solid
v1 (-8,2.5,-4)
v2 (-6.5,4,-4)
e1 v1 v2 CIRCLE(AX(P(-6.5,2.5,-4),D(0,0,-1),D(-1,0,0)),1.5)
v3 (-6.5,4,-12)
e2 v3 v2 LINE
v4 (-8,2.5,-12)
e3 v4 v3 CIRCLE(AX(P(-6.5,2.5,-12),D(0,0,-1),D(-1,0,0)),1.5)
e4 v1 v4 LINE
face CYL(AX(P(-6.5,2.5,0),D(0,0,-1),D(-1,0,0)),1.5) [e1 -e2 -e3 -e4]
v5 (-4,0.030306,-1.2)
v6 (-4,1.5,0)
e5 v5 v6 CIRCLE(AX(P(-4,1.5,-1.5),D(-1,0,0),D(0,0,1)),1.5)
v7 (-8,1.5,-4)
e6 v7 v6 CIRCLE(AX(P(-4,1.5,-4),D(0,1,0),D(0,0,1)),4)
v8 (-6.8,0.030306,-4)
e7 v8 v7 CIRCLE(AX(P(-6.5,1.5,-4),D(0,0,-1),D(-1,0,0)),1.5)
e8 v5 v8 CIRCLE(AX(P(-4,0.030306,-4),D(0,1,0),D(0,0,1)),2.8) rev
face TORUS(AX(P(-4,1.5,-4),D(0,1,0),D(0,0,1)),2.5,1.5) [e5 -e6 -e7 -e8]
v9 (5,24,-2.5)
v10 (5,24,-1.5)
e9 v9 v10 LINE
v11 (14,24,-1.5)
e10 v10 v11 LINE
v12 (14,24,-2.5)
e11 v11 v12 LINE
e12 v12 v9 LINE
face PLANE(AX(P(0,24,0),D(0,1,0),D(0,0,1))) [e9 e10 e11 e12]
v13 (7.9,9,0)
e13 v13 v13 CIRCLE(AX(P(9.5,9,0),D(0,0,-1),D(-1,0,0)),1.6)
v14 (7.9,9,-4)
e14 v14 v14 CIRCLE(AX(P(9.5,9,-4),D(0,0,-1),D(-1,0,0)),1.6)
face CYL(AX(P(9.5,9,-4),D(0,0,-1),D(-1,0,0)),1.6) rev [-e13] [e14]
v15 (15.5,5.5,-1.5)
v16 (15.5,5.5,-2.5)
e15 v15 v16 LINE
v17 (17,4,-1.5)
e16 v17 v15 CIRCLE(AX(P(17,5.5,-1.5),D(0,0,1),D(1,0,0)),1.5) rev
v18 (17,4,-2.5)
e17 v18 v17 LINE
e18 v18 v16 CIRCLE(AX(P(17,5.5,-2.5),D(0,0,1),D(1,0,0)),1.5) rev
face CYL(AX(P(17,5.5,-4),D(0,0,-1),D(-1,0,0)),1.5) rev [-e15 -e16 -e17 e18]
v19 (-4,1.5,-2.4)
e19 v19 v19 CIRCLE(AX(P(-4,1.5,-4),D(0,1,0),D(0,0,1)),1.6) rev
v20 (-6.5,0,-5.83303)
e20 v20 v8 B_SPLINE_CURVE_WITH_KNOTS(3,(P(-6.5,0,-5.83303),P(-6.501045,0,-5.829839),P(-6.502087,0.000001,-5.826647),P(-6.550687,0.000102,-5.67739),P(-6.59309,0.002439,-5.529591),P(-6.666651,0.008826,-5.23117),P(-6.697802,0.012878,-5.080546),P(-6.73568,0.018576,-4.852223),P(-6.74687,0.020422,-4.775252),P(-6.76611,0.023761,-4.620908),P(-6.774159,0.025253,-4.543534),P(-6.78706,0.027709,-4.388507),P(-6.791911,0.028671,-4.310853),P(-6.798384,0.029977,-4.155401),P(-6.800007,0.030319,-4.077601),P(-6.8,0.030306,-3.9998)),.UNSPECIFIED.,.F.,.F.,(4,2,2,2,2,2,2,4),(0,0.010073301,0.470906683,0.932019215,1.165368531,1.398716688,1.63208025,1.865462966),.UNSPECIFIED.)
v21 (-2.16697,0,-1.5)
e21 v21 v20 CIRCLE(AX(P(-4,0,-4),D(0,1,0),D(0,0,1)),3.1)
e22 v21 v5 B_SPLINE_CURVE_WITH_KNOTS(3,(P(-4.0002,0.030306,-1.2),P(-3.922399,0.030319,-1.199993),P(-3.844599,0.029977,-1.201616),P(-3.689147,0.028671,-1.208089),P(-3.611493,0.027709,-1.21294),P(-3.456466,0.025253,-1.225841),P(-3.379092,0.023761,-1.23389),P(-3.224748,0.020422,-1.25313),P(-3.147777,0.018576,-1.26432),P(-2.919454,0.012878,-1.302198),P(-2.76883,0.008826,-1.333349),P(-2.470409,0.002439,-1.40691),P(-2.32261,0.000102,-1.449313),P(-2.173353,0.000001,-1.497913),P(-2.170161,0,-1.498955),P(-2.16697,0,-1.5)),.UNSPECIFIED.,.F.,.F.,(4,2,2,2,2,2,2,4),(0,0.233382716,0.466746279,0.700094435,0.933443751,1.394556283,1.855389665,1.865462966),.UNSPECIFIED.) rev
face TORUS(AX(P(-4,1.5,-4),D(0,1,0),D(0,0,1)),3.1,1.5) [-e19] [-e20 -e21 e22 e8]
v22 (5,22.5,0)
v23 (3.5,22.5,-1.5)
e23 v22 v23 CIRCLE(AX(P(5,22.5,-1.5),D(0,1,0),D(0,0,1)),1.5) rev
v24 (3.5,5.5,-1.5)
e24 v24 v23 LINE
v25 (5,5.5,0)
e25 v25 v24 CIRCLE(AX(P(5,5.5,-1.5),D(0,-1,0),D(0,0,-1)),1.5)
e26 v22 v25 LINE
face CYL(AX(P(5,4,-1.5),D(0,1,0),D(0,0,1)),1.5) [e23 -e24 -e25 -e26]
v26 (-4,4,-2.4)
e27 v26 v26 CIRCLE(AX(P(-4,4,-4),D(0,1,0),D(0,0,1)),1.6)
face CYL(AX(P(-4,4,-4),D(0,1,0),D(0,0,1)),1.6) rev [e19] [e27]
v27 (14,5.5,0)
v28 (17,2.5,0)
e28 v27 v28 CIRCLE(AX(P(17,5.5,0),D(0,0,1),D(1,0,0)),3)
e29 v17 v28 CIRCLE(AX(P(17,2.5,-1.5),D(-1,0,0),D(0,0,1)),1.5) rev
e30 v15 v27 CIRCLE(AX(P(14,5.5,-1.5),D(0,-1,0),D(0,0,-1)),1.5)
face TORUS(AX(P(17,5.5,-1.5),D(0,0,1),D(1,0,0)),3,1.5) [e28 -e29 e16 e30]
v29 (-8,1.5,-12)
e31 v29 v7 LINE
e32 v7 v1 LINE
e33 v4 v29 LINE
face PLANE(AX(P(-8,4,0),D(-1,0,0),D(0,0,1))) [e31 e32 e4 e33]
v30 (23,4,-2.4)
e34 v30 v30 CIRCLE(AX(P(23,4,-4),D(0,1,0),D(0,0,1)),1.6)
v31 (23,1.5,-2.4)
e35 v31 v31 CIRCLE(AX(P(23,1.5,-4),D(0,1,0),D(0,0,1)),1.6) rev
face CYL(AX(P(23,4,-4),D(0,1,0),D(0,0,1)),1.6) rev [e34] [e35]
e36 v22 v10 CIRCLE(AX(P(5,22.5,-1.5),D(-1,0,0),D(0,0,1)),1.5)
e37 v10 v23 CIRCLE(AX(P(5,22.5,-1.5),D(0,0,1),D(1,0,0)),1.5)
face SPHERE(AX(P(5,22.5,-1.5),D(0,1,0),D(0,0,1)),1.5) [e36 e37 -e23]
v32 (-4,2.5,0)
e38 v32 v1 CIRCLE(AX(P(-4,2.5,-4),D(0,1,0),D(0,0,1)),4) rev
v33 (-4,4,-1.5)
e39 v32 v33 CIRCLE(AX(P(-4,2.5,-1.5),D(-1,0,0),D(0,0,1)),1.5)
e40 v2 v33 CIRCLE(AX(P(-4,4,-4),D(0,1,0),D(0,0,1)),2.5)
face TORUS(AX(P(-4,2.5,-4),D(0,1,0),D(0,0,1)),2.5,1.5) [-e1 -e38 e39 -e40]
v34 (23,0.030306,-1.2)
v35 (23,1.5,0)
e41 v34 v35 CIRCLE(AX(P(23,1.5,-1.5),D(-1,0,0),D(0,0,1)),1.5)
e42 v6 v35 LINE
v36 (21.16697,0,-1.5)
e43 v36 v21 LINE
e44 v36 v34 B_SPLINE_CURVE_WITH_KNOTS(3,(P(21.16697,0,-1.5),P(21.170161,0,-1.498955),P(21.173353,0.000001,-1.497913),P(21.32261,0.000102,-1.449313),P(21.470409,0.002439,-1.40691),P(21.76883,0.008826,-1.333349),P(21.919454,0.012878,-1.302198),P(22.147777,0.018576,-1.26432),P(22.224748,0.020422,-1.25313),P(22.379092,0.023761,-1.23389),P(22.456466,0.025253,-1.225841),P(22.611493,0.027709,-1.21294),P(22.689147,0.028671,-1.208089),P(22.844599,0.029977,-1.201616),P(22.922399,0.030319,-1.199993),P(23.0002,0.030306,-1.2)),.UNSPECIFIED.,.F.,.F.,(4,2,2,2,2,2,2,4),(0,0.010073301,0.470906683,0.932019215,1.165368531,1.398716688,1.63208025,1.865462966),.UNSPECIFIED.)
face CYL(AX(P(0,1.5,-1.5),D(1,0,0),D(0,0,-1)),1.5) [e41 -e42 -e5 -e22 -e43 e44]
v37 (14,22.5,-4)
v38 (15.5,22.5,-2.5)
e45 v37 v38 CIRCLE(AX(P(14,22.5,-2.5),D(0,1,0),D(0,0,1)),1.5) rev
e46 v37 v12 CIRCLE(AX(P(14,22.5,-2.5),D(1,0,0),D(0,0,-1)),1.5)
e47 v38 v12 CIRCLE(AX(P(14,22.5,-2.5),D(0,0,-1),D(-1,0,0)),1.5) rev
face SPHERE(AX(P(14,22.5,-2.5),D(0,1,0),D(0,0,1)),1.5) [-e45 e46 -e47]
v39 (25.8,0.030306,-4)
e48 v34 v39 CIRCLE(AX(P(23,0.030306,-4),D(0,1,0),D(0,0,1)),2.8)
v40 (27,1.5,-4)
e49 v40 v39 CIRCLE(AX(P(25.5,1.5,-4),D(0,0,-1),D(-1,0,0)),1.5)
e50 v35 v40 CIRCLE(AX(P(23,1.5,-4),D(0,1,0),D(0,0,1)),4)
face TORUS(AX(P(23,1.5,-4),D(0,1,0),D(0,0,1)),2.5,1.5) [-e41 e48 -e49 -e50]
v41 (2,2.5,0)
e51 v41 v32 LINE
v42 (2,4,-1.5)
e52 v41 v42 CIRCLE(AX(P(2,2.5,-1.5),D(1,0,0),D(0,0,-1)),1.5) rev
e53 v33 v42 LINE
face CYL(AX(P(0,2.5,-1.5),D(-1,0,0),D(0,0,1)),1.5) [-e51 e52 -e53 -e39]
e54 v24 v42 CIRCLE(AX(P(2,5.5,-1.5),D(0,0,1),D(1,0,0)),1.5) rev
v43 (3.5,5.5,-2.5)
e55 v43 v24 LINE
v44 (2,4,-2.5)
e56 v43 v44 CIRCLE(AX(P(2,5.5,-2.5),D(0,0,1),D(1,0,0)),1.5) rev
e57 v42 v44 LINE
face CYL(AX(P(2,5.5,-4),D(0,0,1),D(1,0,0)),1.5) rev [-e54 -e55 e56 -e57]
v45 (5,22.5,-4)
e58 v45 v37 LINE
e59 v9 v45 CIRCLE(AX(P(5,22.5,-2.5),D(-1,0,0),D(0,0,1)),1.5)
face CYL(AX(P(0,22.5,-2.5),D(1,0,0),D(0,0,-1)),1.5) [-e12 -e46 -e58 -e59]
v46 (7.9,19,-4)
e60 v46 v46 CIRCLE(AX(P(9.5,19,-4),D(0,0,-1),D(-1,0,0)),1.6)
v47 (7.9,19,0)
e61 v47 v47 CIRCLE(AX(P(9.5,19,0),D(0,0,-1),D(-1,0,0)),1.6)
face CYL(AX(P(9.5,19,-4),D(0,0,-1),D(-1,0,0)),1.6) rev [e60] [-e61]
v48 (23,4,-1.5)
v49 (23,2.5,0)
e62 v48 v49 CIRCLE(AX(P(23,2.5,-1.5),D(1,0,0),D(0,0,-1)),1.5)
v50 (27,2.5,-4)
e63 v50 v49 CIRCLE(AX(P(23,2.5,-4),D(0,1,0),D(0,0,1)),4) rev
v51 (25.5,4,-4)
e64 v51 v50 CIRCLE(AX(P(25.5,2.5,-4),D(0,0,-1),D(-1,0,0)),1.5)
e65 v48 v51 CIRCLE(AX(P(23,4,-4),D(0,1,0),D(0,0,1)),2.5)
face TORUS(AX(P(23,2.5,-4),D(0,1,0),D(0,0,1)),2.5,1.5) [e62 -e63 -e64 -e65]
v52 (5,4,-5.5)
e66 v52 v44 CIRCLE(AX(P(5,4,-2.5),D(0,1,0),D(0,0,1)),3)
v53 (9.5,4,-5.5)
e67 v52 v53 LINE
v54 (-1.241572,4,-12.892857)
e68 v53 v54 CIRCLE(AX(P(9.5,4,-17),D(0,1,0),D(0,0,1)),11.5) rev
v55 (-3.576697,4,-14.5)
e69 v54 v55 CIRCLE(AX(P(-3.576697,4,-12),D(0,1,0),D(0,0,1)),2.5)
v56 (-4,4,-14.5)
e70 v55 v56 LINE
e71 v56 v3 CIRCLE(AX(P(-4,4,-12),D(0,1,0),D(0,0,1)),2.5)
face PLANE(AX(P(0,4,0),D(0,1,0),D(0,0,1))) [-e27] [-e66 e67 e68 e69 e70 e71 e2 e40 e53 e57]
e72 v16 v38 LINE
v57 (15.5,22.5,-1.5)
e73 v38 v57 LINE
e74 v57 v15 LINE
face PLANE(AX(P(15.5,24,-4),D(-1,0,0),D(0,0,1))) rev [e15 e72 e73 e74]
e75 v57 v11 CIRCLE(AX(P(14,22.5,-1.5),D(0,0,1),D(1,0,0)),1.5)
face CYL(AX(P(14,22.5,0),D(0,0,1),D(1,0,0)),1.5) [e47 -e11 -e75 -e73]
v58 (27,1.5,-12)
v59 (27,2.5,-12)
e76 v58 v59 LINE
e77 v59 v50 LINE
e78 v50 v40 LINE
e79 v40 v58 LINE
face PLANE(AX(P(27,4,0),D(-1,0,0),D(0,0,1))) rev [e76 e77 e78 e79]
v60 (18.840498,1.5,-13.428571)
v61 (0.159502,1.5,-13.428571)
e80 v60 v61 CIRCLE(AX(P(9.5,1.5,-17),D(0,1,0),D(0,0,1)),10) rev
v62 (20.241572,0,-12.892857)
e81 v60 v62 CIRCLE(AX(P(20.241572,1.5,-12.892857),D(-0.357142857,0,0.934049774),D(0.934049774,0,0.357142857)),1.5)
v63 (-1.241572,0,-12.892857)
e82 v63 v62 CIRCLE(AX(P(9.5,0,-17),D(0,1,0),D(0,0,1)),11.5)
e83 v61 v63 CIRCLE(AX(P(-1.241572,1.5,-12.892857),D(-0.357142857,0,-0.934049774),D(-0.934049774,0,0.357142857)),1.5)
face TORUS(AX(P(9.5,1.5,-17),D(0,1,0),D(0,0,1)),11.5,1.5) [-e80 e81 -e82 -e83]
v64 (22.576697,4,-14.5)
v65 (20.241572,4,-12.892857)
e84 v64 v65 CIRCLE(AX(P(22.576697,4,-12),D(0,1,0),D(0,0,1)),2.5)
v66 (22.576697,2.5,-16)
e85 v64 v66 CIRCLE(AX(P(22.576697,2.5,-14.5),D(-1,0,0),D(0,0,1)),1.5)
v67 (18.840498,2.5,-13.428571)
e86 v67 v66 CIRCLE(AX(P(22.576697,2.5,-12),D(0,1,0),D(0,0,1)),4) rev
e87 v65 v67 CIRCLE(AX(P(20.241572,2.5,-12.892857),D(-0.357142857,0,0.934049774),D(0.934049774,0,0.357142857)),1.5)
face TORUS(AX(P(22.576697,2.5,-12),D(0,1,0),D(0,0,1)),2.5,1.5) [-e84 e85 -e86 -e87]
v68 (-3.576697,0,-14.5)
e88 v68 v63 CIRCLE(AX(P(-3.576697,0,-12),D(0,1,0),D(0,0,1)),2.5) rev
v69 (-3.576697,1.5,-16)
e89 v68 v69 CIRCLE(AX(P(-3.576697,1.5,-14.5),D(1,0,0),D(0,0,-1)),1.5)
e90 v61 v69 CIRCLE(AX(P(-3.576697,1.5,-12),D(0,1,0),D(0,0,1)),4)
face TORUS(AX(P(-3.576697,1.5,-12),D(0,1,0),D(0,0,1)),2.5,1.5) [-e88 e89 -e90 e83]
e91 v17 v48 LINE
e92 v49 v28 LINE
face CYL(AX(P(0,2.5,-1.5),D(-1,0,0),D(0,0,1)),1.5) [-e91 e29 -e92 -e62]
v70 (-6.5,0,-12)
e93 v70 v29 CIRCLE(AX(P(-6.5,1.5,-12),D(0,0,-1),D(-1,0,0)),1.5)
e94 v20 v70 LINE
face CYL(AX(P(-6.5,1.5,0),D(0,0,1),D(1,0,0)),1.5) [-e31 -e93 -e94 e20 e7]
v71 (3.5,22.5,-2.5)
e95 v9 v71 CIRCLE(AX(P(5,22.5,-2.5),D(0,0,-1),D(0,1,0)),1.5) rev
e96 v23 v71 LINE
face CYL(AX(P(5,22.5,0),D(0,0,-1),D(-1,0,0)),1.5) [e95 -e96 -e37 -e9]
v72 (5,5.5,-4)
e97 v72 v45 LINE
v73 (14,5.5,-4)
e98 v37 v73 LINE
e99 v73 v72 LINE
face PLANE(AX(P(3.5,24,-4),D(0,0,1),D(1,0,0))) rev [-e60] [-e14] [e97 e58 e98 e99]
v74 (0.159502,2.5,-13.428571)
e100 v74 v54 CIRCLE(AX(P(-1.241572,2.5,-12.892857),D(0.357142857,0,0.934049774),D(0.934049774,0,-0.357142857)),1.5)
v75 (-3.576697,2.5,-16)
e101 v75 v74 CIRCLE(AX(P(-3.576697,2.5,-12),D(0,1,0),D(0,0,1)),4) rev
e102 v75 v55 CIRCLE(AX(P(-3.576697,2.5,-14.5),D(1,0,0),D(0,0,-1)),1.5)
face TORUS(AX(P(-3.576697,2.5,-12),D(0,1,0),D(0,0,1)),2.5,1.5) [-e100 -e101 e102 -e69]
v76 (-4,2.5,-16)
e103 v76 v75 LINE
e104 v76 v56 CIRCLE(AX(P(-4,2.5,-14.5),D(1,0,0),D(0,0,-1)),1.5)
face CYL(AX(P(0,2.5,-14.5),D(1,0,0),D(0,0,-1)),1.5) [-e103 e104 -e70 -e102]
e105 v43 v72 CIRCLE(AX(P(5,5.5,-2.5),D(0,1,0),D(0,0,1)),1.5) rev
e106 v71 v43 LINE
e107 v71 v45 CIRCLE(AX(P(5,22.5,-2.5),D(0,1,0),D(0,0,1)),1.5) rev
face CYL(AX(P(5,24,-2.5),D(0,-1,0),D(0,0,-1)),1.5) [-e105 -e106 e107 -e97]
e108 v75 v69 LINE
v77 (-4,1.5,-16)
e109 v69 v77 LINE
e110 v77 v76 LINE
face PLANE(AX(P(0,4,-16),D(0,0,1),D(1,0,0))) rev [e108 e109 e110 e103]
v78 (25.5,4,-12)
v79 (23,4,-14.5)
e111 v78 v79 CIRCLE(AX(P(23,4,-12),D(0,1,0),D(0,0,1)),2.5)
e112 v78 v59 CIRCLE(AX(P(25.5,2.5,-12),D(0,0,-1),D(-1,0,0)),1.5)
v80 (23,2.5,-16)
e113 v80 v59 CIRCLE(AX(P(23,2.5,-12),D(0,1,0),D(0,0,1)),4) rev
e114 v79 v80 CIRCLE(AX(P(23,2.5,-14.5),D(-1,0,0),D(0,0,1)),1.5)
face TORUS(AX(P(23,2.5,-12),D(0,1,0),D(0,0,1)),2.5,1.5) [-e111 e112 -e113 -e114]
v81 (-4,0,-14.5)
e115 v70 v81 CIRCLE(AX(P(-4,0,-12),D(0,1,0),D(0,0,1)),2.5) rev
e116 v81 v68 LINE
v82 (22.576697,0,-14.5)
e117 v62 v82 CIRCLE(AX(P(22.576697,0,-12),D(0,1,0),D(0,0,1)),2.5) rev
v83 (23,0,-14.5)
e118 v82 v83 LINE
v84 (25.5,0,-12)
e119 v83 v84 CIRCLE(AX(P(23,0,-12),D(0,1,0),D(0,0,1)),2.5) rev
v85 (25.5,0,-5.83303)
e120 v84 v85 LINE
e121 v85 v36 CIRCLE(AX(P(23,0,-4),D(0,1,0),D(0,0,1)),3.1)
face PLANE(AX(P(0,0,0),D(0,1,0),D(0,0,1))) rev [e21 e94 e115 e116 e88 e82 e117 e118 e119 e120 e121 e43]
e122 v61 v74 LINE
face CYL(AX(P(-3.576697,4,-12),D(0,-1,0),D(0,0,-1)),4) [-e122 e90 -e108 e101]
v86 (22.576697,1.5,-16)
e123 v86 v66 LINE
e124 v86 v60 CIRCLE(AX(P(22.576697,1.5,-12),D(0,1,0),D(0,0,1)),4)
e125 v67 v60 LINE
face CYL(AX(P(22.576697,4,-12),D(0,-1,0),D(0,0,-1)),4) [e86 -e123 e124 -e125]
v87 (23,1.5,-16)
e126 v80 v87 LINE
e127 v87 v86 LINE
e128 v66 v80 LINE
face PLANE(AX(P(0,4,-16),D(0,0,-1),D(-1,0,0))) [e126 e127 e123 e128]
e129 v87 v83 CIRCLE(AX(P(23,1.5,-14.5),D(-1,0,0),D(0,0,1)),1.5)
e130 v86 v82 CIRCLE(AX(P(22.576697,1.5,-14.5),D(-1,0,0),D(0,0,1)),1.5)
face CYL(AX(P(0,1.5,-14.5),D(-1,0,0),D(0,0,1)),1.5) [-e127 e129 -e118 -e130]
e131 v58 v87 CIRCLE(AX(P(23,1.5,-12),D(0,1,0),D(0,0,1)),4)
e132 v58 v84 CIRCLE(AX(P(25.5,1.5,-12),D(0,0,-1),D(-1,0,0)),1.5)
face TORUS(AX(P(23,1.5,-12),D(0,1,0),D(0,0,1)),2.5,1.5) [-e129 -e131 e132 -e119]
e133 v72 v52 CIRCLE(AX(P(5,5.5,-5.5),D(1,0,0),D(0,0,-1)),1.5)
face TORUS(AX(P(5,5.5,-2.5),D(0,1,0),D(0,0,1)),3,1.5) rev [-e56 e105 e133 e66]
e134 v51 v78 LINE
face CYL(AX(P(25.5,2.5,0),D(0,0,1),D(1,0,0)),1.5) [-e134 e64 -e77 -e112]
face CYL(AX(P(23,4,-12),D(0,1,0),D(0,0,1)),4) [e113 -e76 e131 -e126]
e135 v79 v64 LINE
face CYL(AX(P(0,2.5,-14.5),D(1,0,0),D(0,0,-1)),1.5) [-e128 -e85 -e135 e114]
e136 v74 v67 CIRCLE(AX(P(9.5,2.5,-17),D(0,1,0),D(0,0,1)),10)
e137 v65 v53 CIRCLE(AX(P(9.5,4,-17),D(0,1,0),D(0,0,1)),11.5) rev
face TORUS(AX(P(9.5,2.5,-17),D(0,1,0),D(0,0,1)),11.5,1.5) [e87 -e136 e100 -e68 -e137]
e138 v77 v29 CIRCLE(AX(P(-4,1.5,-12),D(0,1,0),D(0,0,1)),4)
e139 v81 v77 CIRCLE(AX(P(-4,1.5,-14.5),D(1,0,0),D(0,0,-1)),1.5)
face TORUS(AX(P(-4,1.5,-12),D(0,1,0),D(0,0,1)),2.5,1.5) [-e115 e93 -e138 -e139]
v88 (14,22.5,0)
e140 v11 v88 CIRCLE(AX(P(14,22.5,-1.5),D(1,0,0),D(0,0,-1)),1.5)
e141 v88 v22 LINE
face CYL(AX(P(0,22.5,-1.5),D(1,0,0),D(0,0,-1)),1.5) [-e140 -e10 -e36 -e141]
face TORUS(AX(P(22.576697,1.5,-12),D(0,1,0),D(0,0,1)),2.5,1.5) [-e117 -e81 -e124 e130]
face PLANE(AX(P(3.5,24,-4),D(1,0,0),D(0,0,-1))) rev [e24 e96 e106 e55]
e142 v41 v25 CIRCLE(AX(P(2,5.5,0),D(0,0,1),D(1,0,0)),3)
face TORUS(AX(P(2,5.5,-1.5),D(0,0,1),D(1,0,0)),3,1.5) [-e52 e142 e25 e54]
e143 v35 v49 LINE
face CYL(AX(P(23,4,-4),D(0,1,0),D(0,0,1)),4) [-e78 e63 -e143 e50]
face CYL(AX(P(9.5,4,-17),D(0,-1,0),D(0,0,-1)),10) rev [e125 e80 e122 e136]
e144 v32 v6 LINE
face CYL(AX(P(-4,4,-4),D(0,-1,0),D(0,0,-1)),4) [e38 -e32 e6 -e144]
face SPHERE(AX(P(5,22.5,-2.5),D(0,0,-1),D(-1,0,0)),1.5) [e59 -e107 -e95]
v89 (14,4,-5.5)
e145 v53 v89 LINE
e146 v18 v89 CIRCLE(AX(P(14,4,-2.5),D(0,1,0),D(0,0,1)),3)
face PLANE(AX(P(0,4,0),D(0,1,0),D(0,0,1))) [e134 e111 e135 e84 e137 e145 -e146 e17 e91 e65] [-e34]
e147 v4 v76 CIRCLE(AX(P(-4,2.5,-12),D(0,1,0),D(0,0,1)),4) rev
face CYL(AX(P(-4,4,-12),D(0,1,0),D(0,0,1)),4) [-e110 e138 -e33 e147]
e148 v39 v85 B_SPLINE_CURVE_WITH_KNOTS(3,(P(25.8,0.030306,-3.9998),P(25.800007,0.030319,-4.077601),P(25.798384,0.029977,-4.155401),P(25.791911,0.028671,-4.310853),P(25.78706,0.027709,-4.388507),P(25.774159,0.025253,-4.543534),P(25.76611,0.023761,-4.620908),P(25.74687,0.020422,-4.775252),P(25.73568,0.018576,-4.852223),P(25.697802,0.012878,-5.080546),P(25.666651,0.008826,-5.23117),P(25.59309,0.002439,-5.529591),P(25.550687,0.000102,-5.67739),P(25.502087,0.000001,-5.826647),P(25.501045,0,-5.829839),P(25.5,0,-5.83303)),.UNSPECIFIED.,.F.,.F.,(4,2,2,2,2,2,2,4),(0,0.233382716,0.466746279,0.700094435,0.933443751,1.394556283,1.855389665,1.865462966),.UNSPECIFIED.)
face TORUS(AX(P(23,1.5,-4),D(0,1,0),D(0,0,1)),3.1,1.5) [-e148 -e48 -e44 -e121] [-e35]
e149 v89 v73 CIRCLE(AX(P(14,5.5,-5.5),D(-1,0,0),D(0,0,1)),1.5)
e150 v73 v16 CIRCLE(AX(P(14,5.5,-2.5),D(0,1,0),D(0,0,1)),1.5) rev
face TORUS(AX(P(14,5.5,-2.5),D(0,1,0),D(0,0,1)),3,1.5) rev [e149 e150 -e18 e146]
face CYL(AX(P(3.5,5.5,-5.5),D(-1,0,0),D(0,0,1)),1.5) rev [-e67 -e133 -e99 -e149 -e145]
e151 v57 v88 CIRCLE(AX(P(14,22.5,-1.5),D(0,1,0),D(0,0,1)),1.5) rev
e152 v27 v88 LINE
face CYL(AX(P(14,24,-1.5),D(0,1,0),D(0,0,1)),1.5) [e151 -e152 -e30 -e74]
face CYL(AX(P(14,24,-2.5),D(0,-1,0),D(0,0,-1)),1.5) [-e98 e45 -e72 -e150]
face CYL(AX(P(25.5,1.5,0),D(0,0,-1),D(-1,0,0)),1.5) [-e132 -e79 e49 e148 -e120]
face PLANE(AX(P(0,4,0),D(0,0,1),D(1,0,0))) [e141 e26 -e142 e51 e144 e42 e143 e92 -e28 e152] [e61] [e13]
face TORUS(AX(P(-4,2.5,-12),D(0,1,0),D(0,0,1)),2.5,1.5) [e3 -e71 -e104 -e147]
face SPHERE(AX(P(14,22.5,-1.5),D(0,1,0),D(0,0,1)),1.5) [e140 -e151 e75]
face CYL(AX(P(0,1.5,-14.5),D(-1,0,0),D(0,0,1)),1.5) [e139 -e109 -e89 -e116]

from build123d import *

# Parameters (mm, degrees)
BOSS_EXTRUDE1_DEPTH          = 4
SKETCH7_W                    = 12
SKETCH7_H                    = 4
BOSS_EXTRUDE2_DEPTH          = 20
M3_CLEARANCE_HOLE1_OUTLINE_R = 1.6
M3_CLEARANCE_HOLE1_DEPTH     = 4
FILLET1_R                    = 4
M3_START                     = -4
M3_CLEARANCE_HOLE2_OUTLINE_R = 1.6
M3_CLEARANCE_HOLE2_DEPTH     = 4
FILLET2_R                    = 1.5


# Read off the part's stored shape, not the designer's step: M3 Clearance Hole1, M3 Clearance Hole2
with BuildPart() as part:
    # Sketch2 → Boss-Extrude1 (new body)
    with BuildSketch(Plane(origin=(0, 0, 0), x_dir=(1, 0, 0), z_dir=(0, 1, 0))):
        with BuildLine():
            Line((-0.449874371, 16), (-8, 16))
            Line((-8, 16), (-8, 0))
            Line((-8, 0), (27, 0))
            Line((27, 0), (27, 16))
            Line((27, 16), (19.449874371, 16))
            ThreePointArc((19.449874371, 16), (9.5, 7), (-0.449874371, 16))
        make_face()
    extrude(amount=BOSS_EXTRUDE1_DEPTH)

    # Sketch7 → Boss-Extrude2 (add)
    with BuildSketch(Plane(origin=(0, 4, 0), x_dir=(1, 0, 0), z_dir=(0, 1, 0))):
        with Locations((9.5, 2)):
            Rectangle(SKETCH7_W, SKETCH7_H)
    extrude(amount=BOSS_EXTRUDE2_DEPTH)

    # M3 Clearance Hole1 outline → M3 Clearance Hole1 (cut)
    with BuildSketch(Plane(origin=(0, 0, 0), x_dir=(1, 0, 0), z_dir=(0, 1, 0))):
        with Locations((23, 4)):
            Circle(M3_CLEARANCE_HOLE1_OUTLINE_R)
        with Locations((-4, 4)):
            Circle(M3_CLEARANCE_HOLE1_OUTLINE_R)
    extrude(amount=M3_CLEARANCE_HOLE1_DEPTH, mode=Mode.SUBTRACT)

    # Fillet1
    fillet1_edges = [part.edges().sort_by_distance(p)[0] for p in [
        (27, 2, -16),
        (27, 2, 0),
        (-8, 2, 0),
        (-8, 2, -16),
        (-0.449874371, 2, -16),
        (19.449874371, 2, -16),
    ]]
    fillet(fillet1_edges, radius=FILLET1_R)

    # M3 Clearance Hole2 outline → M3 Clearance Hole2 (cut)
    with BuildSketch(Plane.XY.offset(M3_START)):
        with Locations((9.5, 9)):
            Circle(M3_CLEARANCE_HOLE2_OUTLINE_R)
        with Locations((9.5, 19)):
            Circle(M3_CLEARANCE_HOLE2_OUTLINE_R)
    extrude(amount=M3_CLEARANCE_HOLE2_DEPTH, mode=Mode.SUBTRACT)

    # Fillet2
    # the kernel refuses this fillet: 1.5 mm, written as the material it takes off along each edge
    with BuildSketch(Plane(origin=(5, 22.5, -2.5), x_dir=(0, 0, -1), z_dir=(-1, 0, 0))) as fillet2_piece_1_section:
        Polygon((0, 0), (FILLET2_R, 0), (FILLET2_R, -FILLET2_R), (0, -FILLET2_R), align=None)
    fillet2_piece_1 = extrude(amount=FILLET2_R, mode=Mode.PRIVATE)
    fillet2_piece_1 = fillet2_piece_1 - Plane(origin=(5, 22.5, -2.5), x_dir=(0, -0.7071067811865475, 0.7071067811865475), z_dir=(-1, 0, 0)) * Sphere(FILLET2_R, mode=Mode.PRIVATE)
    add(fillet2_piece_1, mode=Mode.SUBTRACT)
    with BuildSketch(Plane(origin=(14, 22.5, -2.5), x_dir=(0, 0, -1), z_dir=(1, 0, 0))) as fillet2_piece_2_section:
        Polygon((0, 0), (FILLET2_R, 0), (FILLET2_R, FILLET2_R), (0, FILLET2_R), align=None)
    fillet2_piece_2 = extrude(amount=FILLET2_R, mode=Mode.PRIVATE)
    fillet2_piece_2 = fillet2_piece_2 - Plane(origin=(14, 22.5, -2.5), x_dir=(0, -0.7071067811865475, 0.7071067811865475), z_dir=(1, 0, 0)) * Sphere(FILLET2_R, mode=Mode.PRIVATE)
    add(fillet2_piece_2, mode=Mode.SUBTRACT)
    with BuildSketch(Plane(origin=(3.5, 4, -4), x_dir=(0, 0, 1), z_dir=(0, 1, 0))) as fillet2_piece_3:
        with BuildLine():
            CenterArc((FILLET2_R, FILLET2_R), FILLET2_R, 180, 90)
            Line((0, FILLET2_R), (0, 0))
            Line((0, 0), (FILLET2_R, 0))
        make_face()
    extrude(amount=18.5, mode=Mode.SUBTRACT)
    with BuildSketch(Plane(origin=(15.5, 4, -4), x_dir=(0, 0, 1), z_dir=(0, 1, 0))) as fillet2_piece_4:
        with BuildLine():
            CenterArc((FILLET2_R, -FILLET2_R), FILLET2_R, 90, 90)
            Line((0, -FILLET2_R), (0, 0))
            Line((0, 0), (FILLET2_R, 0))
        make_face()
    extrude(amount=18.5, mode=Mode.SUBTRACT)
    with BuildSketch(Plane(origin=(3.5, 24, 3.75), x_dir=(0, -1, 0), z_dir=(0, 0, -1)), Plane(origin=(15.5, 24, -2.5), x_dir=(0, -1, 0), z_dir=(0, 0, 1))) as fillet2_piece_5:
        with BuildLine():
            CenterArc((FILLET2_R, -FILLET2_R), FILLET2_R, 90, 90)
            Line((0, -FILLET2_R), (0, 0))
            Line((0, 0), (FILLET2_R, 0))
        make_face()
    extrude(amount=6.25, mode=Mode.SUBTRACT)
    with BuildSketch(Plane(origin=(19.25, 24, 0), x_dir=(0, -1, 0), z_dir=(-1, 0, 0))) as fillet2_piece_6:
        with BuildLine():
            CenterArc((FILLET2_R, -FILLET2_R), FILLET2_R, 90, 90)
            Line((0, -FILLET2_R), (0, 0))
            Line((0, 0), (FILLET2_R, 0))
        make_face()
    extrude(amount=19.5, mode=Mode.SUBTRACT)
    with BuildSketch(Plane(origin=(5, 24, -4), x_dir=(0, -1, 0), z_dir=(1, 0, 0))) as fillet2_piece_7:
        with BuildLine():
            CenterArc((FILLET2_R, -FILLET2_R), FILLET2_R, 90, 90)
            Line((0, -FILLET2_R), (0, 0))
            Line((0, 0), (FILLET2_R, 0))
        make_face()
    extrude(amount=9, mode=Mode.SUBTRACT)
    with BuildSketch(Plane(origin=(23, 0, -4), x_dir=(1, 0, 0), z_dir=(0, 0, 1))) as fillet2_piece_8:
        with BuildLine():
            CenterArc((1.6 + FILLET2_R, FILLET2_R), FILLET2_R, 180, 90)
            Line((1.6, FILLET2_R), (1.6, 0))
            Line((1.6, 0), (1.6 + FILLET2_R, 0))
        make_face()
    revolve(axis=Axis((23, 0, -4), (0, 1, 0)), mode=Mode.SUBTRACT)
    with BuildSketch(Plane(origin=(-4, 0, -4), x_dir=(1, 0, 0), z_dir=(0, 0, 1))) as fillet2_piece_9:
        with BuildLine():
            CenterArc((1.6 + FILLET2_R, FILLET2_R), FILLET2_R, 180, 90)
            Line((1.6, FILLET2_R), (1.6, 0))
            Line((1.6, 0), (1.6 + FILLET2_R, 0))
        make_face()
    revolve(axis=Axis((-4, 0, -4), (0, 1, 0)), mode=Mode.SUBTRACT)
    with BuildSketch(Plane(origin=(9.5, 0, -17), x_dir=(0.9340497736158586, 0, 0.3571428571428573), z_dir=(0.3571428571428573, 0, -0.9340497736158586))) as fillet2_piece_10:
        with BuildLine():
            CenterArc((10 + FILLET2_R, -FILLET2_R), FILLET2_R, 90, 90)
            Line((10, -FILLET2_R), (10, 0))
            Line((10, 0), (10 + FILLET2_R, 0))
        make_face()
    revolve(axis=Axis((9.5, 0, -17), (0, -1, 0)), revolution_arc=138.150335145, mode=Mode.SUBTRACT)
    with BuildSketch(Plane(origin=(23, 0, -16), x_dir=(0, 0, 1), z_dir=(-1, 0, 0))) as fillet2_piece_11:
        with BuildLine():
            CenterArc((FILLET2_R, FILLET2_R), FILLET2_R, 180, 90)
            Line((0, FILLET2_R), (0, 0))
            Line((0, 0), (FILLET2_R, 0))
        make_face()
    extrude(amount=0.423303169, mode=Mode.SUBTRACT)
    with BuildSketch(Plane(origin=(27, 0, -4), x_dir=(-1, 0, 0), z_dir=(0, 0, -1)), Plane(origin=(-8, 0, -12), x_dir=(1, 0, 0), z_dir=(0, 0, 1))) as fillet2_piece_12:
        with BuildLine():
            CenterArc((FILLET2_R, FILLET2_R), FILLET2_R, 180, 90)
            Line((0, FILLET2_R), (0, 0))
            Line((0, 0), (FILLET2_R, 0))
        make_face()
    extrude(amount=8, mode=Mode.SUBTRACT)
    with BuildSketch(Plane(origin=(-4, 0, 0), x_dir=(0, 0, -1), z_dir=(1, 0, 0))) as fillet2_piece_13:
        with BuildLine():
            CenterArc((FILLET2_R, FILLET2_R), FILLET2_R, 180, 90)
            Line((0, FILLET2_R), (0, 0))
            Line((0, 0), (FILLET2_R, 0))
        make_face()
    extrude(amount=27, mode=Mode.SUBTRACT)
    with BuildSketch(Plane(origin=(-3.576696831, 0, -16), x_dir=(0, 1, 0), z_dir=(-1, 0, 0))) as fillet2_piece_14:
        with BuildLine():
            CenterArc((FILLET2_R, -FILLET2_R), FILLET2_R, 90, 90)
            Line((0, -FILLET2_R), (0, 0))
            Line((0, 0), (FILLET2_R, 0))
        make_face()
    extrude(amount=0.423303169, mode=Mode.SUBTRACT)
    with BuildSketch(Plane(origin=(-4, 0, -12), x_dir=(0, 0, -1), z_dir=(1, 0, 0))) as fillet2_piece_15:
        with BuildLine():
            CenterArc((4 - FILLET2_R, FILLET2_R), FILLET2_R, 270, 90)
            Line((4, FILLET2_R), (4, 0))
            Line((4, 0), (4 - FILLET2_R, 0))
        make_face()
    revolve(axis=Axis((-4, 0, -12), (0, 1, 0)), revolution_arc=90, mode=Mode.SUBTRACT)
    with BuildSketch(Plane(origin=(-4, 0, -4), x_dir=(-1, 0, 0), z_dir=(0, 0, -1))) as fillet2_piece_16:
        with BuildLine():
            CenterArc((4 - FILLET2_R, FILLET2_R), FILLET2_R, 270, 90)
            Line((4, FILLET2_R), (4, 0))
            Line((4, 0), (4 - FILLET2_R, 0))
        make_face()
    revolve(axis=Axis((-4, 0, -4), (0, 1, 0)), revolution_arc=90, mode=Mode.SUBTRACT)
    with BuildSketch(Plane(origin=(23, 0, -4), x_dir=(0, 0, 1), z_dir=(-1, 0, 0))) as fillet2_piece_17:
        with BuildLine():
            CenterArc((4 - FILLET2_R, FILLET2_R), FILLET2_R, 270, 90)
            Line((4, FILLET2_R), (4, 0))
            Line((4, 0), (4 - FILLET2_R, 0))
        make_face()
    revolve(axis=Axis((23, 0, -4), (0, 1, 0)), revolution_arc=90, mode=Mode.SUBTRACT)
    with BuildSketch(Plane(origin=(23, 0, -12), x_dir=(0, 0, -1), z_dir=(-1, 0, 0))) as fillet2_piece_18:
        with BuildLine():
            CenterArc((4 - FILLET2_R, -FILLET2_R), FILLET2_R, 0, 90)
            Line((4, -FILLET2_R), (4, 0))
            Line((4, 0), (4 - FILLET2_R, 0))
        make_face()
    revolve(axis=Axis((23, 0, -12), (0, -1, 0)), revolution_arc=90, mode=Mode.SUBTRACT)
    with BuildSketch(Plane(origin=(-3.576696831, 0, -12), x_dir=(0, 0, -1), z_dir=(-1, 0, 0))) as fillet2_piece_19:
        with BuildLine():
            CenterArc((4 - FILLET2_R, -FILLET2_R), FILLET2_R, 0, 90)
            Line((4, -FILLET2_R), (4, 0))
            Line((4, 0), (4 - FILLET2_R, 0))
        make_face()
    revolve(axis=Axis((-3.576696831, 0, -12), (0, -1, 0)), revolution_arc=69.075167572, mode=Mode.SUBTRACT)
    with BuildSketch(Plane(origin=(22.576696831, 0, -12), x_dir=(-0.9340497736158588, 0, -0.3571428571428566), z_dir=(-0.3571428571428566, 0, 0.9340497736158588))) as fillet2_piece_20:
        with BuildLine():
            CenterArc((4 - FILLET2_R, -FILLET2_R), FILLET2_R, 0, 90)
            Line((4, -FILLET2_R), (4, 0))
            Line((4, 0), (4 - FILLET2_R, 0))
        make_face()
    revolve(axis=Axis((22.576696831, 0, -12), (0, -1, 0)), revolution_arc=69.075167572, mode=Mode.SUBTRACT)
    # the kernel refuses this fillet: 1.5 mm, written as the material it adds along each edge
    with BuildSketch(Plane(origin=(3.5, 4, 0), x_dir=(-1, 0, 0), z_dir=(0, 0, -1)), Plane(origin=(15.5, 4, -2.5), x_dir=(1, 0, 0), z_dir=(0, 0, 1))) as fillet2_2_piece_1:
        with BuildLine():
            CenterArc((FILLET2_R, FILLET2_R), FILLET2_R, 180, 90)
            Line((0, FILLET2_R), (0, 0))
            Line((0, 0), (FILLET2_R, 0))
        make_face()
    extrude(amount=2.5)
    with BuildSketch(Plane(origin=(5, 4, -4), x_dir=(0, 0, -1), z_dir=(1, 0, 0))) as fillet2_2_piece_2:
        with BuildLine():
            CenterArc((FILLET2_R, FILLET2_R), FILLET2_R, 180, 90)
            Line((0, FILLET2_R), (0, 0))
            Line((0, 0), (FILLET2_R, 0))
        make_face()
    extrude(amount=9)
    with BuildSketch(Plane(origin=(5, 4, -2.5), x_dir=(-1, 0, 0), z_dir=(0, 0, 1))) as fillet2_2_piece_3:
        with BuildLine():
            CenterArc((1.5 + FILLET2_R, -FILLET2_R), FILLET2_R, 90, 90)
            Line((1.5, -FILLET2_R), (1.5, 0))
            Line((1.5, 0), (1.5 + FILLET2_R, 0))
        make_face()
    revolve(axis=Axis((5, 4, -2.5), (0, -1, 0)), revolution_arc=90)
    with BuildSketch(Plane(origin=(14, 4, -2.5), x_dir=(1, 0, 0), z_dir=(0, 0, 1))) as fillet2_2_piece_4:
        with BuildLine():
            CenterArc((1.5 + FILLET2_R, FILLET2_R), FILLET2_R, 180, 90)
            Line((1.5, FILLET2_R), (1.5, 0))
            Line((1.5, 0), (1.5 + FILLET2_R, 0))
        make_face()
    revolve(axis=Axis((14, 4, -2.5), (0, 1, 0)), revolution_arc=90)
    # the kernel refuses this fillet: 1.5 mm, written as the material it takes off along each edge
    with BuildSketch(Plane(origin=(14, 22.5, -1.5), x_dir=(1, 0, 0), z_dir=(0, 0, 1))) as fillet2_3_piece_1_section:
        Polygon((0, 0), (FILLET2_R, 0), (FILLET2_R, FILLET2_R), (0, FILLET2_R), align=None)
    fillet2_3_piece_1 = extrude(amount=FILLET2_R, mode=Mode.PRIVATE)
    fillet2_3_piece_1 = fillet2_3_piece_1 - Plane(origin=(14, 22.5, -1.5), x_dir=(-0.7071067811865475, -0.7071067811865475, 0), z_dir=(0, 0, 1)) * Sphere(FILLET2_R, mode=Mode.PRIVATE)
    add(fillet2_3_piece_1, mode=Mode.SUBTRACT)
    with BuildSketch(Plane(origin=(5, 22.5, -1.5), x_dir=(-1, 0, 0), z_dir=(0, 0, 1))) as fillet2_3_piece_2_section:
        Polygon((0, 0), (FILLET2_R, 0), (FILLET2_R, -FILLET2_R), (0, -FILLET2_R), align=None)
    fillet2_3_piece_2 = extrude(amount=FILLET2_R, mode=Mode.PRIVATE)
    fillet2_3_piece_2 = fillet2_3_piece_2 - Plane(origin=(5, 22.5, -1.5), x_dir=(0.7071067811865475, -0.7071067811865475, 0), z_dir=(0, 0, 1)) * Sphere(FILLET2_R, mode=Mode.PRIVATE)
    add(fillet2_3_piece_2, mode=Mode.SUBTRACT)
    with BuildSketch(Plane(origin=(-4, 4, 0), x_dir=(0, 0, -1), z_dir=(1, 0, 0)), Plane(origin=(17, 4, 0), x_dir=(0, 0, -1), z_dir=(1, 0, 0))) as fillet2_3_piece_3:
        with BuildLine():
            CenterArc((FILLET2_R, -FILLET2_R), FILLET2_R, 90, 90)
            Line((0, -FILLET2_R), (0, 0))
            Line((0, 0), (FILLET2_R, 0))
        make_face()
    extrude(amount=6, mode=Mode.SUBTRACT)
    with BuildSketch(Plane(origin=(3.5, 5.5, 0), x_dir=(1, 0, 0), z_dir=(0, 1, 0))) as fillet2_3_piece_4:
        with BuildLine():
            CenterArc((FILLET2_R, FILLET2_R), FILLET2_R, 180, 90)
            Line((0, FILLET2_R), (0, 0))
            Line((0, 0), (FILLET2_R, 0))
        make_face()
    extrude(amount=17, mode=Mode.SUBTRACT)
    with BuildSketch(Plane(origin=(15.5, 5.5, 0), x_dir=(-1, 0, 0), z_dir=(0, 1, 0))) as fillet2_3_piece_5:
        with BuildLine():
            CenterArc((FILLET2_R, -FILLET2_R), FILLET2_R, 90, 90)
            Line((0, -FILLET2_R), (0, 0))
            Line((0, 0), (FILLET2_R, 0))
        make_face()
    extrude(amount=17, mode=Mode.SUBTRACT)
    with BuildSketch(Plane(origin=(9.5, 4, -17), x_dir=(0.9340497736158586, 0, 0.3571428571428573), z_dir=(0.3571428571428573, 0, -0.9340497736158586))) as fillet2_3_piece_6:
        with BuildLine():
            CenterArc((10 + FILLET2_R, FILLET2_R), FILLET2_R, 180, 90)
            Line((10, FILLET2_R), (10, 0))
            Line((10, 0), (10 + FILLET2_R, 0))
        make_face()
    revolve(axis=Axis((9.5, 4, -17), (0, -1, 0)), revolution_arc=138.150335145, mode=Mode.SUBTRACT)
    with BuildSketch(Plane(origin=(23, 4, -16), x_dir=(0, 0, 1), z_dir=(-1, 0, 0))) as fillet2_3_piece_7:
        with BuildLine():
            CenterArc((FILLET2_R, -FILLET2_R), FILLET2_R, 90, 90)
            Line((0, -FILLET2_R), (0, 0))
            Line((0, 0), (FILLET2_R, 0))
        make_face()
    extrude(amount=0.423303169, mode=Mode.SUBTRACT)
    with BuildSketch(Plane(origin=(27, 4, -4), x_dir=(-1, 0, 0), z_dir=(0, 0, -1)), Plane(origin=(-8, 4, -12), x_dir=(1, 0, 0), z_dir=(0, 0, 1))) as fillet2_3_piece_8:
        with BuildLine():
            CenterArc((FILLET2_R, -FILLET2_R), FILLET2_R, 90, 90)
            Line((0, -FILLET2_R), (0, 0))
            Line((0, 0), (FILLET2_R, 0))
        make_face()
    extrude(amount=8, mode=Mode.SUBTRACT)
    with BuildSketch(Plane(origin=(-3.576696831, 4, -16), x_dir=(0, -1, 0), z_dir=(-1, 0, 0))) as fillet2_3_piece_9:
        with BuildLine():
            CenterArc((FILLET2_R, FILLET2_R), FILLET2_R, 180, 90)
            Line((0, FILLET2_R), (0, 0))
            Line((0, 0), (FILLET2_R, 0))
        make_face()
    extrude(amount=0.423303169, mode=Mode.SUBTRACT)
    with BuildSketch(Plane(origin=(-4, 4, -12), x_dir=(0, 0, -1), z_dir=(1, 0, 0))) as fillet2_3_piece_10:
        with BuildLine():
            CenterArc((4 - FILLET2_R, -FILLET2_R), FILLET2_R, 0, 90)
            Line((4 - FILLET2_R, 0), (4, 0))
            Line((4, 0), (4, -FILLET2_R))
        make_face()
    revolve(axis=Axis((-4, 4, -12), (0, 1, 0)), revolution_arc=90, mode=Mode.SUBTRACT)
    with BuildSketch(Plane(origin=(-4, 4, -4), x_dir=(-1, 0, 0), z_dir=(0, 0, -1))) as fillet2_3_piece_11:
        with BuildLine():
            CenterArc((4 - FILLET2_R, -FILLET2_R), FILLET2_R, 0, 90)
            Line((4, -FILLET2_R), (4, 0))
            Line((4, 0), (4 - FILLET2_R, 0))
        make_face()
    revolve(axis=Axis((-4, 4, -4), (0, 1, 0)), revolution_arc=90, mode=Mode.SUBTRACT)
    with BuildSketch(Plane(origin=(23, 4, -4), x_dir=(0, 0, 1), z_dir=(-1, 0, 0))) as fillet2_3_piece_12:
        with BuildLine():
            CenterArc((4 - FILLET2_R, -FILLET2_R), FILLET2_R, 0, 90)
            Line((4, -FILLET2_R), (4, 0))
            Line((4, 0), (4 - FILLET2_R, 0))
        make_face()
    revolve(axis=Axis((23, 4, -4), (0, 1, 0)), revolution_arc=90, mode=Mode.SUBTRACT)
    with BuildSketch(Plane(origin=(23, 4, -12), x_dir=(0, 0, -1), z_dir=(-1, 0, 0))) as fillet2_3_piece_13:
        with BuildLine():
            CenterArc((4 - FILLET2_R, FILLET2_R), FILLET2_R, 270, 90)
            Line((4, FILLET2_R), (4, 0))
            Line((4, 0), (4 - FILLET2_R, 0))
        make_face()
    revolve(axis=Axis((23, 4, -12), (0, -1, 0)), revolution_arc=90, mode=Mode.SUBTRACT)
    with BuildSketch(Plane(origin=(-3.576696831, 4, -12), x_dir=(0, 0, -1), z_dir=(-1, 0, 0))) as fillet2_3_piece_14:
        with BuildLine():
            CenterArc((4 - FILLET2_R, FILLET2_R), FILLET2_R, 270, 90)
            Line((4, FILLET2_R), (4, 0))
            Line((4, 0), (4 - FILLET2_R, 0))
        make_face()
    revolve(axis=Axis((-3.576696831, 4, -12), (0, -1, 0)), revolution_arc=69.075167572, mode=Mode.SUBTRACT)
    with BuildSketch(Plane(origin=(22.576696831, 4, -12), x_dir=(-0.9340497736158588, 0, -0.3571428571428566), z_dir=(-0.3571428571428566, 0, 0.9340497736158588))) as fillet2_3_piece_15:
        with BuildLine():
            CenterArc((4 - FILLET2_R, FILLET2_R), FILLET2_R, 270, 90)
            Line((4, FILLET2_R), (4, 0))
            Line((4, 0), (4 - FILLET2_R, 0))
        make_face()
    revolve(axis=Axis((22.576696831, 4, -12), (0, -1, 0)), revolution_arc=69.075167572, mode=Mode.SUBTRACT)
    with BuildSketch(Plane(origin=(17, 5.5, 0), x_dir=(0, -1, 0), z_dir=(1, 0, 0))) as fillet2_3_piece_16:
        with BuildLine():
            CenterArc((1.5 + FILLET2_R, FILLET2_R), FILLET2_R, 180, 90)
            Line((1.5, FILLET2_R), (1.5, 0))
            Line((1.5, 0), (1.5 + FILLET2_R, 0))
        make_face()
    revolve(axis=Axis((17, 5.5, 0), (0, 0, -1)), revolution_arc=90, mode=Mode.SUBTRACT)
    with BuildSketch(Plane(origin=(2, 5.5, 0), x_dir=(0, -1, 0), z_dir=(-1, 0, 0))) as fillet2_3_piece_17:
        with BuildLine():
            CenterArc((1.5 + FILLET2_R, -FILLET2_R), FILLET2_R, 90, 90)
            Line((1.5, -FILLET2_R), (1.5, 0))
            Line((1.5, 0), (1.5 + FILLET2_R, 0))
        make_face()
    revolve(axis=Axis((2, 5.5, 0), (0, 0, 1)), revolution_arc=90, mode=Mode.SUBTRACT)


solid = part.part
